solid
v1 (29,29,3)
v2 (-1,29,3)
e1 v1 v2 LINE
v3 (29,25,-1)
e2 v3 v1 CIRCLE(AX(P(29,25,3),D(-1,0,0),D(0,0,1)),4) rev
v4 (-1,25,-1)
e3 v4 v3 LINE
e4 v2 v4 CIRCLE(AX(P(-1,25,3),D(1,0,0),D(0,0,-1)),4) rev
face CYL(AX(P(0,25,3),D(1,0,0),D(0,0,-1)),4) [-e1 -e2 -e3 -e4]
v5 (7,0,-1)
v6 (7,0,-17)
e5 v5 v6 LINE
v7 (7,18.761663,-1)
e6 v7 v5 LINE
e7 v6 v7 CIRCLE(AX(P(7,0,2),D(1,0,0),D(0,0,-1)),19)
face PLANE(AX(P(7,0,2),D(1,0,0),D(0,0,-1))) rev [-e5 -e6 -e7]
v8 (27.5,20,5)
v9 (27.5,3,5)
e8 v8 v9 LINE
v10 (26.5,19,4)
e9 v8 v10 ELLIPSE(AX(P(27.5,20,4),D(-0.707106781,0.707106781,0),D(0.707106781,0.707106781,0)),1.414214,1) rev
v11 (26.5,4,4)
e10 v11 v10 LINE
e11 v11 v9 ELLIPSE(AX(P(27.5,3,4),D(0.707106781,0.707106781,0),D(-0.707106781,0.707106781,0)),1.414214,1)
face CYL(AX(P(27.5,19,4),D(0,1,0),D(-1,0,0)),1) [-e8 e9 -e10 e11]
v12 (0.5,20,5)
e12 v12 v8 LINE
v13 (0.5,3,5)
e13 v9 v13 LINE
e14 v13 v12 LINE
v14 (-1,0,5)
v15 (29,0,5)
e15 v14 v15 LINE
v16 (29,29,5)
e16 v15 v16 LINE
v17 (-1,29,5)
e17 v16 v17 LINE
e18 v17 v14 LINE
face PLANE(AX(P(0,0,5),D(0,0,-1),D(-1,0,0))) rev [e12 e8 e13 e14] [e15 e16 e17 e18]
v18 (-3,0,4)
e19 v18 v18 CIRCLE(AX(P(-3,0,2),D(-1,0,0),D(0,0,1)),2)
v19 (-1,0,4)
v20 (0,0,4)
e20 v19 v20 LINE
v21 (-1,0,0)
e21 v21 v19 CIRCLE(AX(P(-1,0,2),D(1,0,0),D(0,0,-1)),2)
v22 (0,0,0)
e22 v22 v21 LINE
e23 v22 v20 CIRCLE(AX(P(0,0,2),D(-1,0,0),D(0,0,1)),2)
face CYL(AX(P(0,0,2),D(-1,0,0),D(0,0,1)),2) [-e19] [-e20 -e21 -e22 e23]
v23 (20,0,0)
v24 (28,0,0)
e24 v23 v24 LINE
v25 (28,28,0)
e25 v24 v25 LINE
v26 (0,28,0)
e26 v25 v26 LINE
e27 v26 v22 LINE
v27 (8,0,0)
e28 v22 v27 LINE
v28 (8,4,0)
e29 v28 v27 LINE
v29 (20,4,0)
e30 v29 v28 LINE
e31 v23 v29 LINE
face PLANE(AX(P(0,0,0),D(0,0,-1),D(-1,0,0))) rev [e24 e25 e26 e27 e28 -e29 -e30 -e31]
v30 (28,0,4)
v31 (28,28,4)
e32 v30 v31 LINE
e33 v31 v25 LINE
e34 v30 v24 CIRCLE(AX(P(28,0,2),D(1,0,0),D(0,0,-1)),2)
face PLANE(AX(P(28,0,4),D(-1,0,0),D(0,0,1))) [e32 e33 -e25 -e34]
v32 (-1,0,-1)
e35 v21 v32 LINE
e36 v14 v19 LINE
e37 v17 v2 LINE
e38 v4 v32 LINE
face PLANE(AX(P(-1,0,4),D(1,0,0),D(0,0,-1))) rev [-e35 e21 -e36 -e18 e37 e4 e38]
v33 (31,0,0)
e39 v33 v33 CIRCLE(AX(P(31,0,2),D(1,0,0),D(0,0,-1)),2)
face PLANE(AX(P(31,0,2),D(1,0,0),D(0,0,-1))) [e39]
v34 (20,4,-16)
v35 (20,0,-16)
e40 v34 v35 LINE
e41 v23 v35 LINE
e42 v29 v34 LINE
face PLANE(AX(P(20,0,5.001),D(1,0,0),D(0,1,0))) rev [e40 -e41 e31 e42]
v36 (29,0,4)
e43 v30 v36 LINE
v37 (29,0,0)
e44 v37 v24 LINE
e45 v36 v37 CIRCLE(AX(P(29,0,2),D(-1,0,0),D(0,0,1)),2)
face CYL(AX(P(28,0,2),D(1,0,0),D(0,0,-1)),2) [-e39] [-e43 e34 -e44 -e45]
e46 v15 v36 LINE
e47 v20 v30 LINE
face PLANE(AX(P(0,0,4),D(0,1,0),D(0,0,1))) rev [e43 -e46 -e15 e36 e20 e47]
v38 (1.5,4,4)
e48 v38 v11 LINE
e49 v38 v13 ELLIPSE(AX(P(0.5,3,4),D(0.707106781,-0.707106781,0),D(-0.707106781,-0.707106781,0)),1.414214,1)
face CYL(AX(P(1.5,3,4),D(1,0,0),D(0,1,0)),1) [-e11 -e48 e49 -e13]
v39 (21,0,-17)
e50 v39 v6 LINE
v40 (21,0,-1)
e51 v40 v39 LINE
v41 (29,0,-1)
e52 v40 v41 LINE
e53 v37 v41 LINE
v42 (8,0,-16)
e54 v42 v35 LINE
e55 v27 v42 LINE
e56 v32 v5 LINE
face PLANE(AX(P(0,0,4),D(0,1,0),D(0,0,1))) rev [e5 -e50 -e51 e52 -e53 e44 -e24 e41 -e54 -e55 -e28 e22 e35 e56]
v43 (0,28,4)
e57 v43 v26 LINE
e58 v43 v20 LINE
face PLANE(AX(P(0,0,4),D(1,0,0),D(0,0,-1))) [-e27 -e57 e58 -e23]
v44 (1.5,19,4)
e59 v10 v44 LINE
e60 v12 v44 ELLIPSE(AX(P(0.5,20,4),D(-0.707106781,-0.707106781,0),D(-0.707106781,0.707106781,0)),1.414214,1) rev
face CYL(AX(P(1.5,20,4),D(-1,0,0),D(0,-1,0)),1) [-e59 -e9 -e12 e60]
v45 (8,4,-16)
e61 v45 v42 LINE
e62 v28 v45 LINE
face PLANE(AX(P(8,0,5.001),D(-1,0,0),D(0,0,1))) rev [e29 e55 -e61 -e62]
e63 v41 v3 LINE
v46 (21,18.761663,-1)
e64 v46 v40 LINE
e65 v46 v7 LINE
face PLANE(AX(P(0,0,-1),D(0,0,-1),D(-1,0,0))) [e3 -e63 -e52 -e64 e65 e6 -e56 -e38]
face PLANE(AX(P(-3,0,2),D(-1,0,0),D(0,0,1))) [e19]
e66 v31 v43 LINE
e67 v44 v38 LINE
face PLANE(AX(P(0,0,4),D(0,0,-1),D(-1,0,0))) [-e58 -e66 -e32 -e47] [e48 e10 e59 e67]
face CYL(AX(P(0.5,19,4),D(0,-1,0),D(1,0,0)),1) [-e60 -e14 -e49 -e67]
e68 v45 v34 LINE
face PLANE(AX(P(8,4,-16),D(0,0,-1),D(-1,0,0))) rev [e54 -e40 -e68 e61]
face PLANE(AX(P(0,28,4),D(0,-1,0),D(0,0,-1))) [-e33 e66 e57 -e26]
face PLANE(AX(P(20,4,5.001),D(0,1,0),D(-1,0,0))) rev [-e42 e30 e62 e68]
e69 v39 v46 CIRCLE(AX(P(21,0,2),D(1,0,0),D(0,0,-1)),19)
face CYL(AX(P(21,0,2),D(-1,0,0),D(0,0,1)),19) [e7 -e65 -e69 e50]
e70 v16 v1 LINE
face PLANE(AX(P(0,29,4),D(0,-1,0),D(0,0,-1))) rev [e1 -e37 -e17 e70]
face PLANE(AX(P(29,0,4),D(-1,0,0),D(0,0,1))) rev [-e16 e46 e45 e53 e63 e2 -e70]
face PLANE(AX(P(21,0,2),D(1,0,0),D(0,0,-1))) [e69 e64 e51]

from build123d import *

# Parameters (mm, degrees)
ESQUISSE1_W              = 28
ESQUISSE1_H              = 28
BOSS_EXTRU_1_DEPTH       = 4
COQUE1_T                 = 1
ENL_V_MAT_EXTRU_1_REACH  = 43.449
ESQUISSE2_W              = 25
ESQUISSE2_H              = 15
CONG_1_R                 = 4
CONG_3_R                 = 1
ENL_V_MAT_EXTRU_13_REACH = 43.449
ESQUISSE21_W             = 12
ESQUISSE21_H             = 4
BOSS_EXTRU_8_START       = -15
BOSS_EXTRU_8_DEPTH       = 7
ESQUISSE26_W             = 12
ESQUISSE26_H             = 15
ENL_V_MAT_EXTRU_15_DEPTH = 4
BOSS_EXTRU_9_DEPTH       = 2
BOSS_EXTRU_9_DEPTH_BACK  = 1
ESQUISSE29_R             = 2
BOSS_EXTRU_10_DEPTH      = 2
BOSS_EXTRU_10_DEPTH_BACK = 1
ESQUISSE30_R             = 2


with BuildPart() as part:
    # Esquisse1 → Boss.-Extru.1 (new body)
    with BuildSketch(Plane.XY):
        with Locations((14, 14)):
            Rectangle(ESQUISSE1_W, ESQUISSE1_H)
    extrude(amount=BOSS_EXTRU_1_DEPTH)

    # Coque1
    coque1_openings = [part.faces().sort_by_distance(p)[0] for p in [
        (14, 0, 2),
    ]]
    offset(amount=COQUE1_T, openings=coque1_openings, kind=Kind.INTERSECTION)

    # Esquisse2 → Enlèv. mat.-Extru.1 (cut, up to next)
    with BuildSketch(Plane.XY.offset(5), mode=Mode.PRIVATE) as enl_v_mat_extru_1_sk1:
        with Locations((14, 11.5)):
            Rectangle(ESQUISSE2_W, ESQUISSE2_H)
    enl_v_mat_extru_1_tool1 = extrude(enl_v_mat_extru_1_sk1.sketch, amount=-ENL_V_MAT_EXTRU_1_REACH, mode=Mode.PRIVATE) & part.part
    add(enl_v_mat_extru_1_tool1.solids().sort_by_distance((14, 11.5, 5))[0], mode=Mode.SUBTRACT)

    # Congé1
    cong_1_edges = [part.edges().sort_by_distance(p)[0] for p in [
        (14, 29, -1),
    ]]
    fillet(cong_1_edges, radius=CONG_1_R)

    # Congé3
    cong_3_edges = [part.edges().sort_by_distance(p)[0] for p in [
        (26.5, 11.5, 5),
        (14, 19, 5),
        (1.5, 11.5, 5),
        (14, 4, 5),
    ]]
    fillet(cong_3_edges, radius=CONG_3_R - 0.0001)  # a hair under: the kernel refuses the full size

    # Esquisse21 → Enlèv. mat.-Extru.13 (cut, up to next)
    with BuildSketch(Plane(origin=(0, 0, -1), x_dir=(-1, 0, 0), z_dir=(0, 0, -1)), mode=Mode.PRIVATE) as enl_v_mat_extru_13_sk1:
        with Locations((-14, 2)):
            Rectangle(ESQUISSE21_W, ESQUISSE21_H)
    enl_v_mat_extru_13_tool1 = extrude(enl_v_mat_extru_13_sk1.sketch, amount=-ENL_V_MAT_EXTRU_13_REACH, mode=Mode.PRIVATE) & part.part
    add(enl_v_mat_extru_13_tool1.solids().sort_by_distance((14, 2, -1))[0], mode=Mode.SUBTRACT)

    # Esquisse24 → Boss.-Extru.8 (add, symmetric)
    with BuildSketch(Plane(origin=(29, 0, 0), x_dir=(0, 0, -1), z_dir=(1, 0, 0)).offset(BOSS_EXTRU_8_START)):
        with BuildLine():
            Line((1, 0), (17, 0))
            ThreePointArc((17, 0), (12.456832295, 12.328828006), (1, 18.761663039))
            Line((1, 18.761663039), (1, 0))
        make_face()
    extrude(amount=BOSS_EXTRU_8_DEPTH, both=True)

    # Esquisse26 → Enlèv. mat.-Extru.15 (cut)
    with BuildSketch(Plane.XZ):
        with Locations((14, -8.5)):
            Rectangle(ESQUISSE26_W, ESQUISSE26_H)
    extrude(amount=-ENL_V_MAT_EXTRU_15_DEPTH, mode=Mode.SUBTRACT)

    # Esquisse29 → Boss.-Extru.9 (add, two sides: drawn at the far end of the back side and taken through both)
    with BuildSketch(Plane(origin=(29, 0, 0), x_dir=(0, 0, -1), z_dir=(1, 0, 0)).offset(-BOSS_EXTRU_9_DEPTH_BACK)):
        with Locations((-2, 0)):
            Circle(ESQUISSE29_R)
    extrude(amount=BOSS_EXTRU_9_DEPTH + BOSS_EXTRU_9_DEPTH_BACK)

    # Esquisse30 → Boss.-Extru.10 (add, two sides: drawn at the far end of the back side and taken through both)
    with BuildSketch(Plane.ZY.offset(1).offset(-BOSS_EXTRU_10_DEPTH_BACK)):
        with Locations(Location((2, 0, 0), (0, 0, 180))):
            Circle(ESQUISSE30_R)
    extrude(amount=BOSS_EXTRU_10_DEPTH + BOSS_EXTRU_10_DEPTH_BACK)


solid = part.part
